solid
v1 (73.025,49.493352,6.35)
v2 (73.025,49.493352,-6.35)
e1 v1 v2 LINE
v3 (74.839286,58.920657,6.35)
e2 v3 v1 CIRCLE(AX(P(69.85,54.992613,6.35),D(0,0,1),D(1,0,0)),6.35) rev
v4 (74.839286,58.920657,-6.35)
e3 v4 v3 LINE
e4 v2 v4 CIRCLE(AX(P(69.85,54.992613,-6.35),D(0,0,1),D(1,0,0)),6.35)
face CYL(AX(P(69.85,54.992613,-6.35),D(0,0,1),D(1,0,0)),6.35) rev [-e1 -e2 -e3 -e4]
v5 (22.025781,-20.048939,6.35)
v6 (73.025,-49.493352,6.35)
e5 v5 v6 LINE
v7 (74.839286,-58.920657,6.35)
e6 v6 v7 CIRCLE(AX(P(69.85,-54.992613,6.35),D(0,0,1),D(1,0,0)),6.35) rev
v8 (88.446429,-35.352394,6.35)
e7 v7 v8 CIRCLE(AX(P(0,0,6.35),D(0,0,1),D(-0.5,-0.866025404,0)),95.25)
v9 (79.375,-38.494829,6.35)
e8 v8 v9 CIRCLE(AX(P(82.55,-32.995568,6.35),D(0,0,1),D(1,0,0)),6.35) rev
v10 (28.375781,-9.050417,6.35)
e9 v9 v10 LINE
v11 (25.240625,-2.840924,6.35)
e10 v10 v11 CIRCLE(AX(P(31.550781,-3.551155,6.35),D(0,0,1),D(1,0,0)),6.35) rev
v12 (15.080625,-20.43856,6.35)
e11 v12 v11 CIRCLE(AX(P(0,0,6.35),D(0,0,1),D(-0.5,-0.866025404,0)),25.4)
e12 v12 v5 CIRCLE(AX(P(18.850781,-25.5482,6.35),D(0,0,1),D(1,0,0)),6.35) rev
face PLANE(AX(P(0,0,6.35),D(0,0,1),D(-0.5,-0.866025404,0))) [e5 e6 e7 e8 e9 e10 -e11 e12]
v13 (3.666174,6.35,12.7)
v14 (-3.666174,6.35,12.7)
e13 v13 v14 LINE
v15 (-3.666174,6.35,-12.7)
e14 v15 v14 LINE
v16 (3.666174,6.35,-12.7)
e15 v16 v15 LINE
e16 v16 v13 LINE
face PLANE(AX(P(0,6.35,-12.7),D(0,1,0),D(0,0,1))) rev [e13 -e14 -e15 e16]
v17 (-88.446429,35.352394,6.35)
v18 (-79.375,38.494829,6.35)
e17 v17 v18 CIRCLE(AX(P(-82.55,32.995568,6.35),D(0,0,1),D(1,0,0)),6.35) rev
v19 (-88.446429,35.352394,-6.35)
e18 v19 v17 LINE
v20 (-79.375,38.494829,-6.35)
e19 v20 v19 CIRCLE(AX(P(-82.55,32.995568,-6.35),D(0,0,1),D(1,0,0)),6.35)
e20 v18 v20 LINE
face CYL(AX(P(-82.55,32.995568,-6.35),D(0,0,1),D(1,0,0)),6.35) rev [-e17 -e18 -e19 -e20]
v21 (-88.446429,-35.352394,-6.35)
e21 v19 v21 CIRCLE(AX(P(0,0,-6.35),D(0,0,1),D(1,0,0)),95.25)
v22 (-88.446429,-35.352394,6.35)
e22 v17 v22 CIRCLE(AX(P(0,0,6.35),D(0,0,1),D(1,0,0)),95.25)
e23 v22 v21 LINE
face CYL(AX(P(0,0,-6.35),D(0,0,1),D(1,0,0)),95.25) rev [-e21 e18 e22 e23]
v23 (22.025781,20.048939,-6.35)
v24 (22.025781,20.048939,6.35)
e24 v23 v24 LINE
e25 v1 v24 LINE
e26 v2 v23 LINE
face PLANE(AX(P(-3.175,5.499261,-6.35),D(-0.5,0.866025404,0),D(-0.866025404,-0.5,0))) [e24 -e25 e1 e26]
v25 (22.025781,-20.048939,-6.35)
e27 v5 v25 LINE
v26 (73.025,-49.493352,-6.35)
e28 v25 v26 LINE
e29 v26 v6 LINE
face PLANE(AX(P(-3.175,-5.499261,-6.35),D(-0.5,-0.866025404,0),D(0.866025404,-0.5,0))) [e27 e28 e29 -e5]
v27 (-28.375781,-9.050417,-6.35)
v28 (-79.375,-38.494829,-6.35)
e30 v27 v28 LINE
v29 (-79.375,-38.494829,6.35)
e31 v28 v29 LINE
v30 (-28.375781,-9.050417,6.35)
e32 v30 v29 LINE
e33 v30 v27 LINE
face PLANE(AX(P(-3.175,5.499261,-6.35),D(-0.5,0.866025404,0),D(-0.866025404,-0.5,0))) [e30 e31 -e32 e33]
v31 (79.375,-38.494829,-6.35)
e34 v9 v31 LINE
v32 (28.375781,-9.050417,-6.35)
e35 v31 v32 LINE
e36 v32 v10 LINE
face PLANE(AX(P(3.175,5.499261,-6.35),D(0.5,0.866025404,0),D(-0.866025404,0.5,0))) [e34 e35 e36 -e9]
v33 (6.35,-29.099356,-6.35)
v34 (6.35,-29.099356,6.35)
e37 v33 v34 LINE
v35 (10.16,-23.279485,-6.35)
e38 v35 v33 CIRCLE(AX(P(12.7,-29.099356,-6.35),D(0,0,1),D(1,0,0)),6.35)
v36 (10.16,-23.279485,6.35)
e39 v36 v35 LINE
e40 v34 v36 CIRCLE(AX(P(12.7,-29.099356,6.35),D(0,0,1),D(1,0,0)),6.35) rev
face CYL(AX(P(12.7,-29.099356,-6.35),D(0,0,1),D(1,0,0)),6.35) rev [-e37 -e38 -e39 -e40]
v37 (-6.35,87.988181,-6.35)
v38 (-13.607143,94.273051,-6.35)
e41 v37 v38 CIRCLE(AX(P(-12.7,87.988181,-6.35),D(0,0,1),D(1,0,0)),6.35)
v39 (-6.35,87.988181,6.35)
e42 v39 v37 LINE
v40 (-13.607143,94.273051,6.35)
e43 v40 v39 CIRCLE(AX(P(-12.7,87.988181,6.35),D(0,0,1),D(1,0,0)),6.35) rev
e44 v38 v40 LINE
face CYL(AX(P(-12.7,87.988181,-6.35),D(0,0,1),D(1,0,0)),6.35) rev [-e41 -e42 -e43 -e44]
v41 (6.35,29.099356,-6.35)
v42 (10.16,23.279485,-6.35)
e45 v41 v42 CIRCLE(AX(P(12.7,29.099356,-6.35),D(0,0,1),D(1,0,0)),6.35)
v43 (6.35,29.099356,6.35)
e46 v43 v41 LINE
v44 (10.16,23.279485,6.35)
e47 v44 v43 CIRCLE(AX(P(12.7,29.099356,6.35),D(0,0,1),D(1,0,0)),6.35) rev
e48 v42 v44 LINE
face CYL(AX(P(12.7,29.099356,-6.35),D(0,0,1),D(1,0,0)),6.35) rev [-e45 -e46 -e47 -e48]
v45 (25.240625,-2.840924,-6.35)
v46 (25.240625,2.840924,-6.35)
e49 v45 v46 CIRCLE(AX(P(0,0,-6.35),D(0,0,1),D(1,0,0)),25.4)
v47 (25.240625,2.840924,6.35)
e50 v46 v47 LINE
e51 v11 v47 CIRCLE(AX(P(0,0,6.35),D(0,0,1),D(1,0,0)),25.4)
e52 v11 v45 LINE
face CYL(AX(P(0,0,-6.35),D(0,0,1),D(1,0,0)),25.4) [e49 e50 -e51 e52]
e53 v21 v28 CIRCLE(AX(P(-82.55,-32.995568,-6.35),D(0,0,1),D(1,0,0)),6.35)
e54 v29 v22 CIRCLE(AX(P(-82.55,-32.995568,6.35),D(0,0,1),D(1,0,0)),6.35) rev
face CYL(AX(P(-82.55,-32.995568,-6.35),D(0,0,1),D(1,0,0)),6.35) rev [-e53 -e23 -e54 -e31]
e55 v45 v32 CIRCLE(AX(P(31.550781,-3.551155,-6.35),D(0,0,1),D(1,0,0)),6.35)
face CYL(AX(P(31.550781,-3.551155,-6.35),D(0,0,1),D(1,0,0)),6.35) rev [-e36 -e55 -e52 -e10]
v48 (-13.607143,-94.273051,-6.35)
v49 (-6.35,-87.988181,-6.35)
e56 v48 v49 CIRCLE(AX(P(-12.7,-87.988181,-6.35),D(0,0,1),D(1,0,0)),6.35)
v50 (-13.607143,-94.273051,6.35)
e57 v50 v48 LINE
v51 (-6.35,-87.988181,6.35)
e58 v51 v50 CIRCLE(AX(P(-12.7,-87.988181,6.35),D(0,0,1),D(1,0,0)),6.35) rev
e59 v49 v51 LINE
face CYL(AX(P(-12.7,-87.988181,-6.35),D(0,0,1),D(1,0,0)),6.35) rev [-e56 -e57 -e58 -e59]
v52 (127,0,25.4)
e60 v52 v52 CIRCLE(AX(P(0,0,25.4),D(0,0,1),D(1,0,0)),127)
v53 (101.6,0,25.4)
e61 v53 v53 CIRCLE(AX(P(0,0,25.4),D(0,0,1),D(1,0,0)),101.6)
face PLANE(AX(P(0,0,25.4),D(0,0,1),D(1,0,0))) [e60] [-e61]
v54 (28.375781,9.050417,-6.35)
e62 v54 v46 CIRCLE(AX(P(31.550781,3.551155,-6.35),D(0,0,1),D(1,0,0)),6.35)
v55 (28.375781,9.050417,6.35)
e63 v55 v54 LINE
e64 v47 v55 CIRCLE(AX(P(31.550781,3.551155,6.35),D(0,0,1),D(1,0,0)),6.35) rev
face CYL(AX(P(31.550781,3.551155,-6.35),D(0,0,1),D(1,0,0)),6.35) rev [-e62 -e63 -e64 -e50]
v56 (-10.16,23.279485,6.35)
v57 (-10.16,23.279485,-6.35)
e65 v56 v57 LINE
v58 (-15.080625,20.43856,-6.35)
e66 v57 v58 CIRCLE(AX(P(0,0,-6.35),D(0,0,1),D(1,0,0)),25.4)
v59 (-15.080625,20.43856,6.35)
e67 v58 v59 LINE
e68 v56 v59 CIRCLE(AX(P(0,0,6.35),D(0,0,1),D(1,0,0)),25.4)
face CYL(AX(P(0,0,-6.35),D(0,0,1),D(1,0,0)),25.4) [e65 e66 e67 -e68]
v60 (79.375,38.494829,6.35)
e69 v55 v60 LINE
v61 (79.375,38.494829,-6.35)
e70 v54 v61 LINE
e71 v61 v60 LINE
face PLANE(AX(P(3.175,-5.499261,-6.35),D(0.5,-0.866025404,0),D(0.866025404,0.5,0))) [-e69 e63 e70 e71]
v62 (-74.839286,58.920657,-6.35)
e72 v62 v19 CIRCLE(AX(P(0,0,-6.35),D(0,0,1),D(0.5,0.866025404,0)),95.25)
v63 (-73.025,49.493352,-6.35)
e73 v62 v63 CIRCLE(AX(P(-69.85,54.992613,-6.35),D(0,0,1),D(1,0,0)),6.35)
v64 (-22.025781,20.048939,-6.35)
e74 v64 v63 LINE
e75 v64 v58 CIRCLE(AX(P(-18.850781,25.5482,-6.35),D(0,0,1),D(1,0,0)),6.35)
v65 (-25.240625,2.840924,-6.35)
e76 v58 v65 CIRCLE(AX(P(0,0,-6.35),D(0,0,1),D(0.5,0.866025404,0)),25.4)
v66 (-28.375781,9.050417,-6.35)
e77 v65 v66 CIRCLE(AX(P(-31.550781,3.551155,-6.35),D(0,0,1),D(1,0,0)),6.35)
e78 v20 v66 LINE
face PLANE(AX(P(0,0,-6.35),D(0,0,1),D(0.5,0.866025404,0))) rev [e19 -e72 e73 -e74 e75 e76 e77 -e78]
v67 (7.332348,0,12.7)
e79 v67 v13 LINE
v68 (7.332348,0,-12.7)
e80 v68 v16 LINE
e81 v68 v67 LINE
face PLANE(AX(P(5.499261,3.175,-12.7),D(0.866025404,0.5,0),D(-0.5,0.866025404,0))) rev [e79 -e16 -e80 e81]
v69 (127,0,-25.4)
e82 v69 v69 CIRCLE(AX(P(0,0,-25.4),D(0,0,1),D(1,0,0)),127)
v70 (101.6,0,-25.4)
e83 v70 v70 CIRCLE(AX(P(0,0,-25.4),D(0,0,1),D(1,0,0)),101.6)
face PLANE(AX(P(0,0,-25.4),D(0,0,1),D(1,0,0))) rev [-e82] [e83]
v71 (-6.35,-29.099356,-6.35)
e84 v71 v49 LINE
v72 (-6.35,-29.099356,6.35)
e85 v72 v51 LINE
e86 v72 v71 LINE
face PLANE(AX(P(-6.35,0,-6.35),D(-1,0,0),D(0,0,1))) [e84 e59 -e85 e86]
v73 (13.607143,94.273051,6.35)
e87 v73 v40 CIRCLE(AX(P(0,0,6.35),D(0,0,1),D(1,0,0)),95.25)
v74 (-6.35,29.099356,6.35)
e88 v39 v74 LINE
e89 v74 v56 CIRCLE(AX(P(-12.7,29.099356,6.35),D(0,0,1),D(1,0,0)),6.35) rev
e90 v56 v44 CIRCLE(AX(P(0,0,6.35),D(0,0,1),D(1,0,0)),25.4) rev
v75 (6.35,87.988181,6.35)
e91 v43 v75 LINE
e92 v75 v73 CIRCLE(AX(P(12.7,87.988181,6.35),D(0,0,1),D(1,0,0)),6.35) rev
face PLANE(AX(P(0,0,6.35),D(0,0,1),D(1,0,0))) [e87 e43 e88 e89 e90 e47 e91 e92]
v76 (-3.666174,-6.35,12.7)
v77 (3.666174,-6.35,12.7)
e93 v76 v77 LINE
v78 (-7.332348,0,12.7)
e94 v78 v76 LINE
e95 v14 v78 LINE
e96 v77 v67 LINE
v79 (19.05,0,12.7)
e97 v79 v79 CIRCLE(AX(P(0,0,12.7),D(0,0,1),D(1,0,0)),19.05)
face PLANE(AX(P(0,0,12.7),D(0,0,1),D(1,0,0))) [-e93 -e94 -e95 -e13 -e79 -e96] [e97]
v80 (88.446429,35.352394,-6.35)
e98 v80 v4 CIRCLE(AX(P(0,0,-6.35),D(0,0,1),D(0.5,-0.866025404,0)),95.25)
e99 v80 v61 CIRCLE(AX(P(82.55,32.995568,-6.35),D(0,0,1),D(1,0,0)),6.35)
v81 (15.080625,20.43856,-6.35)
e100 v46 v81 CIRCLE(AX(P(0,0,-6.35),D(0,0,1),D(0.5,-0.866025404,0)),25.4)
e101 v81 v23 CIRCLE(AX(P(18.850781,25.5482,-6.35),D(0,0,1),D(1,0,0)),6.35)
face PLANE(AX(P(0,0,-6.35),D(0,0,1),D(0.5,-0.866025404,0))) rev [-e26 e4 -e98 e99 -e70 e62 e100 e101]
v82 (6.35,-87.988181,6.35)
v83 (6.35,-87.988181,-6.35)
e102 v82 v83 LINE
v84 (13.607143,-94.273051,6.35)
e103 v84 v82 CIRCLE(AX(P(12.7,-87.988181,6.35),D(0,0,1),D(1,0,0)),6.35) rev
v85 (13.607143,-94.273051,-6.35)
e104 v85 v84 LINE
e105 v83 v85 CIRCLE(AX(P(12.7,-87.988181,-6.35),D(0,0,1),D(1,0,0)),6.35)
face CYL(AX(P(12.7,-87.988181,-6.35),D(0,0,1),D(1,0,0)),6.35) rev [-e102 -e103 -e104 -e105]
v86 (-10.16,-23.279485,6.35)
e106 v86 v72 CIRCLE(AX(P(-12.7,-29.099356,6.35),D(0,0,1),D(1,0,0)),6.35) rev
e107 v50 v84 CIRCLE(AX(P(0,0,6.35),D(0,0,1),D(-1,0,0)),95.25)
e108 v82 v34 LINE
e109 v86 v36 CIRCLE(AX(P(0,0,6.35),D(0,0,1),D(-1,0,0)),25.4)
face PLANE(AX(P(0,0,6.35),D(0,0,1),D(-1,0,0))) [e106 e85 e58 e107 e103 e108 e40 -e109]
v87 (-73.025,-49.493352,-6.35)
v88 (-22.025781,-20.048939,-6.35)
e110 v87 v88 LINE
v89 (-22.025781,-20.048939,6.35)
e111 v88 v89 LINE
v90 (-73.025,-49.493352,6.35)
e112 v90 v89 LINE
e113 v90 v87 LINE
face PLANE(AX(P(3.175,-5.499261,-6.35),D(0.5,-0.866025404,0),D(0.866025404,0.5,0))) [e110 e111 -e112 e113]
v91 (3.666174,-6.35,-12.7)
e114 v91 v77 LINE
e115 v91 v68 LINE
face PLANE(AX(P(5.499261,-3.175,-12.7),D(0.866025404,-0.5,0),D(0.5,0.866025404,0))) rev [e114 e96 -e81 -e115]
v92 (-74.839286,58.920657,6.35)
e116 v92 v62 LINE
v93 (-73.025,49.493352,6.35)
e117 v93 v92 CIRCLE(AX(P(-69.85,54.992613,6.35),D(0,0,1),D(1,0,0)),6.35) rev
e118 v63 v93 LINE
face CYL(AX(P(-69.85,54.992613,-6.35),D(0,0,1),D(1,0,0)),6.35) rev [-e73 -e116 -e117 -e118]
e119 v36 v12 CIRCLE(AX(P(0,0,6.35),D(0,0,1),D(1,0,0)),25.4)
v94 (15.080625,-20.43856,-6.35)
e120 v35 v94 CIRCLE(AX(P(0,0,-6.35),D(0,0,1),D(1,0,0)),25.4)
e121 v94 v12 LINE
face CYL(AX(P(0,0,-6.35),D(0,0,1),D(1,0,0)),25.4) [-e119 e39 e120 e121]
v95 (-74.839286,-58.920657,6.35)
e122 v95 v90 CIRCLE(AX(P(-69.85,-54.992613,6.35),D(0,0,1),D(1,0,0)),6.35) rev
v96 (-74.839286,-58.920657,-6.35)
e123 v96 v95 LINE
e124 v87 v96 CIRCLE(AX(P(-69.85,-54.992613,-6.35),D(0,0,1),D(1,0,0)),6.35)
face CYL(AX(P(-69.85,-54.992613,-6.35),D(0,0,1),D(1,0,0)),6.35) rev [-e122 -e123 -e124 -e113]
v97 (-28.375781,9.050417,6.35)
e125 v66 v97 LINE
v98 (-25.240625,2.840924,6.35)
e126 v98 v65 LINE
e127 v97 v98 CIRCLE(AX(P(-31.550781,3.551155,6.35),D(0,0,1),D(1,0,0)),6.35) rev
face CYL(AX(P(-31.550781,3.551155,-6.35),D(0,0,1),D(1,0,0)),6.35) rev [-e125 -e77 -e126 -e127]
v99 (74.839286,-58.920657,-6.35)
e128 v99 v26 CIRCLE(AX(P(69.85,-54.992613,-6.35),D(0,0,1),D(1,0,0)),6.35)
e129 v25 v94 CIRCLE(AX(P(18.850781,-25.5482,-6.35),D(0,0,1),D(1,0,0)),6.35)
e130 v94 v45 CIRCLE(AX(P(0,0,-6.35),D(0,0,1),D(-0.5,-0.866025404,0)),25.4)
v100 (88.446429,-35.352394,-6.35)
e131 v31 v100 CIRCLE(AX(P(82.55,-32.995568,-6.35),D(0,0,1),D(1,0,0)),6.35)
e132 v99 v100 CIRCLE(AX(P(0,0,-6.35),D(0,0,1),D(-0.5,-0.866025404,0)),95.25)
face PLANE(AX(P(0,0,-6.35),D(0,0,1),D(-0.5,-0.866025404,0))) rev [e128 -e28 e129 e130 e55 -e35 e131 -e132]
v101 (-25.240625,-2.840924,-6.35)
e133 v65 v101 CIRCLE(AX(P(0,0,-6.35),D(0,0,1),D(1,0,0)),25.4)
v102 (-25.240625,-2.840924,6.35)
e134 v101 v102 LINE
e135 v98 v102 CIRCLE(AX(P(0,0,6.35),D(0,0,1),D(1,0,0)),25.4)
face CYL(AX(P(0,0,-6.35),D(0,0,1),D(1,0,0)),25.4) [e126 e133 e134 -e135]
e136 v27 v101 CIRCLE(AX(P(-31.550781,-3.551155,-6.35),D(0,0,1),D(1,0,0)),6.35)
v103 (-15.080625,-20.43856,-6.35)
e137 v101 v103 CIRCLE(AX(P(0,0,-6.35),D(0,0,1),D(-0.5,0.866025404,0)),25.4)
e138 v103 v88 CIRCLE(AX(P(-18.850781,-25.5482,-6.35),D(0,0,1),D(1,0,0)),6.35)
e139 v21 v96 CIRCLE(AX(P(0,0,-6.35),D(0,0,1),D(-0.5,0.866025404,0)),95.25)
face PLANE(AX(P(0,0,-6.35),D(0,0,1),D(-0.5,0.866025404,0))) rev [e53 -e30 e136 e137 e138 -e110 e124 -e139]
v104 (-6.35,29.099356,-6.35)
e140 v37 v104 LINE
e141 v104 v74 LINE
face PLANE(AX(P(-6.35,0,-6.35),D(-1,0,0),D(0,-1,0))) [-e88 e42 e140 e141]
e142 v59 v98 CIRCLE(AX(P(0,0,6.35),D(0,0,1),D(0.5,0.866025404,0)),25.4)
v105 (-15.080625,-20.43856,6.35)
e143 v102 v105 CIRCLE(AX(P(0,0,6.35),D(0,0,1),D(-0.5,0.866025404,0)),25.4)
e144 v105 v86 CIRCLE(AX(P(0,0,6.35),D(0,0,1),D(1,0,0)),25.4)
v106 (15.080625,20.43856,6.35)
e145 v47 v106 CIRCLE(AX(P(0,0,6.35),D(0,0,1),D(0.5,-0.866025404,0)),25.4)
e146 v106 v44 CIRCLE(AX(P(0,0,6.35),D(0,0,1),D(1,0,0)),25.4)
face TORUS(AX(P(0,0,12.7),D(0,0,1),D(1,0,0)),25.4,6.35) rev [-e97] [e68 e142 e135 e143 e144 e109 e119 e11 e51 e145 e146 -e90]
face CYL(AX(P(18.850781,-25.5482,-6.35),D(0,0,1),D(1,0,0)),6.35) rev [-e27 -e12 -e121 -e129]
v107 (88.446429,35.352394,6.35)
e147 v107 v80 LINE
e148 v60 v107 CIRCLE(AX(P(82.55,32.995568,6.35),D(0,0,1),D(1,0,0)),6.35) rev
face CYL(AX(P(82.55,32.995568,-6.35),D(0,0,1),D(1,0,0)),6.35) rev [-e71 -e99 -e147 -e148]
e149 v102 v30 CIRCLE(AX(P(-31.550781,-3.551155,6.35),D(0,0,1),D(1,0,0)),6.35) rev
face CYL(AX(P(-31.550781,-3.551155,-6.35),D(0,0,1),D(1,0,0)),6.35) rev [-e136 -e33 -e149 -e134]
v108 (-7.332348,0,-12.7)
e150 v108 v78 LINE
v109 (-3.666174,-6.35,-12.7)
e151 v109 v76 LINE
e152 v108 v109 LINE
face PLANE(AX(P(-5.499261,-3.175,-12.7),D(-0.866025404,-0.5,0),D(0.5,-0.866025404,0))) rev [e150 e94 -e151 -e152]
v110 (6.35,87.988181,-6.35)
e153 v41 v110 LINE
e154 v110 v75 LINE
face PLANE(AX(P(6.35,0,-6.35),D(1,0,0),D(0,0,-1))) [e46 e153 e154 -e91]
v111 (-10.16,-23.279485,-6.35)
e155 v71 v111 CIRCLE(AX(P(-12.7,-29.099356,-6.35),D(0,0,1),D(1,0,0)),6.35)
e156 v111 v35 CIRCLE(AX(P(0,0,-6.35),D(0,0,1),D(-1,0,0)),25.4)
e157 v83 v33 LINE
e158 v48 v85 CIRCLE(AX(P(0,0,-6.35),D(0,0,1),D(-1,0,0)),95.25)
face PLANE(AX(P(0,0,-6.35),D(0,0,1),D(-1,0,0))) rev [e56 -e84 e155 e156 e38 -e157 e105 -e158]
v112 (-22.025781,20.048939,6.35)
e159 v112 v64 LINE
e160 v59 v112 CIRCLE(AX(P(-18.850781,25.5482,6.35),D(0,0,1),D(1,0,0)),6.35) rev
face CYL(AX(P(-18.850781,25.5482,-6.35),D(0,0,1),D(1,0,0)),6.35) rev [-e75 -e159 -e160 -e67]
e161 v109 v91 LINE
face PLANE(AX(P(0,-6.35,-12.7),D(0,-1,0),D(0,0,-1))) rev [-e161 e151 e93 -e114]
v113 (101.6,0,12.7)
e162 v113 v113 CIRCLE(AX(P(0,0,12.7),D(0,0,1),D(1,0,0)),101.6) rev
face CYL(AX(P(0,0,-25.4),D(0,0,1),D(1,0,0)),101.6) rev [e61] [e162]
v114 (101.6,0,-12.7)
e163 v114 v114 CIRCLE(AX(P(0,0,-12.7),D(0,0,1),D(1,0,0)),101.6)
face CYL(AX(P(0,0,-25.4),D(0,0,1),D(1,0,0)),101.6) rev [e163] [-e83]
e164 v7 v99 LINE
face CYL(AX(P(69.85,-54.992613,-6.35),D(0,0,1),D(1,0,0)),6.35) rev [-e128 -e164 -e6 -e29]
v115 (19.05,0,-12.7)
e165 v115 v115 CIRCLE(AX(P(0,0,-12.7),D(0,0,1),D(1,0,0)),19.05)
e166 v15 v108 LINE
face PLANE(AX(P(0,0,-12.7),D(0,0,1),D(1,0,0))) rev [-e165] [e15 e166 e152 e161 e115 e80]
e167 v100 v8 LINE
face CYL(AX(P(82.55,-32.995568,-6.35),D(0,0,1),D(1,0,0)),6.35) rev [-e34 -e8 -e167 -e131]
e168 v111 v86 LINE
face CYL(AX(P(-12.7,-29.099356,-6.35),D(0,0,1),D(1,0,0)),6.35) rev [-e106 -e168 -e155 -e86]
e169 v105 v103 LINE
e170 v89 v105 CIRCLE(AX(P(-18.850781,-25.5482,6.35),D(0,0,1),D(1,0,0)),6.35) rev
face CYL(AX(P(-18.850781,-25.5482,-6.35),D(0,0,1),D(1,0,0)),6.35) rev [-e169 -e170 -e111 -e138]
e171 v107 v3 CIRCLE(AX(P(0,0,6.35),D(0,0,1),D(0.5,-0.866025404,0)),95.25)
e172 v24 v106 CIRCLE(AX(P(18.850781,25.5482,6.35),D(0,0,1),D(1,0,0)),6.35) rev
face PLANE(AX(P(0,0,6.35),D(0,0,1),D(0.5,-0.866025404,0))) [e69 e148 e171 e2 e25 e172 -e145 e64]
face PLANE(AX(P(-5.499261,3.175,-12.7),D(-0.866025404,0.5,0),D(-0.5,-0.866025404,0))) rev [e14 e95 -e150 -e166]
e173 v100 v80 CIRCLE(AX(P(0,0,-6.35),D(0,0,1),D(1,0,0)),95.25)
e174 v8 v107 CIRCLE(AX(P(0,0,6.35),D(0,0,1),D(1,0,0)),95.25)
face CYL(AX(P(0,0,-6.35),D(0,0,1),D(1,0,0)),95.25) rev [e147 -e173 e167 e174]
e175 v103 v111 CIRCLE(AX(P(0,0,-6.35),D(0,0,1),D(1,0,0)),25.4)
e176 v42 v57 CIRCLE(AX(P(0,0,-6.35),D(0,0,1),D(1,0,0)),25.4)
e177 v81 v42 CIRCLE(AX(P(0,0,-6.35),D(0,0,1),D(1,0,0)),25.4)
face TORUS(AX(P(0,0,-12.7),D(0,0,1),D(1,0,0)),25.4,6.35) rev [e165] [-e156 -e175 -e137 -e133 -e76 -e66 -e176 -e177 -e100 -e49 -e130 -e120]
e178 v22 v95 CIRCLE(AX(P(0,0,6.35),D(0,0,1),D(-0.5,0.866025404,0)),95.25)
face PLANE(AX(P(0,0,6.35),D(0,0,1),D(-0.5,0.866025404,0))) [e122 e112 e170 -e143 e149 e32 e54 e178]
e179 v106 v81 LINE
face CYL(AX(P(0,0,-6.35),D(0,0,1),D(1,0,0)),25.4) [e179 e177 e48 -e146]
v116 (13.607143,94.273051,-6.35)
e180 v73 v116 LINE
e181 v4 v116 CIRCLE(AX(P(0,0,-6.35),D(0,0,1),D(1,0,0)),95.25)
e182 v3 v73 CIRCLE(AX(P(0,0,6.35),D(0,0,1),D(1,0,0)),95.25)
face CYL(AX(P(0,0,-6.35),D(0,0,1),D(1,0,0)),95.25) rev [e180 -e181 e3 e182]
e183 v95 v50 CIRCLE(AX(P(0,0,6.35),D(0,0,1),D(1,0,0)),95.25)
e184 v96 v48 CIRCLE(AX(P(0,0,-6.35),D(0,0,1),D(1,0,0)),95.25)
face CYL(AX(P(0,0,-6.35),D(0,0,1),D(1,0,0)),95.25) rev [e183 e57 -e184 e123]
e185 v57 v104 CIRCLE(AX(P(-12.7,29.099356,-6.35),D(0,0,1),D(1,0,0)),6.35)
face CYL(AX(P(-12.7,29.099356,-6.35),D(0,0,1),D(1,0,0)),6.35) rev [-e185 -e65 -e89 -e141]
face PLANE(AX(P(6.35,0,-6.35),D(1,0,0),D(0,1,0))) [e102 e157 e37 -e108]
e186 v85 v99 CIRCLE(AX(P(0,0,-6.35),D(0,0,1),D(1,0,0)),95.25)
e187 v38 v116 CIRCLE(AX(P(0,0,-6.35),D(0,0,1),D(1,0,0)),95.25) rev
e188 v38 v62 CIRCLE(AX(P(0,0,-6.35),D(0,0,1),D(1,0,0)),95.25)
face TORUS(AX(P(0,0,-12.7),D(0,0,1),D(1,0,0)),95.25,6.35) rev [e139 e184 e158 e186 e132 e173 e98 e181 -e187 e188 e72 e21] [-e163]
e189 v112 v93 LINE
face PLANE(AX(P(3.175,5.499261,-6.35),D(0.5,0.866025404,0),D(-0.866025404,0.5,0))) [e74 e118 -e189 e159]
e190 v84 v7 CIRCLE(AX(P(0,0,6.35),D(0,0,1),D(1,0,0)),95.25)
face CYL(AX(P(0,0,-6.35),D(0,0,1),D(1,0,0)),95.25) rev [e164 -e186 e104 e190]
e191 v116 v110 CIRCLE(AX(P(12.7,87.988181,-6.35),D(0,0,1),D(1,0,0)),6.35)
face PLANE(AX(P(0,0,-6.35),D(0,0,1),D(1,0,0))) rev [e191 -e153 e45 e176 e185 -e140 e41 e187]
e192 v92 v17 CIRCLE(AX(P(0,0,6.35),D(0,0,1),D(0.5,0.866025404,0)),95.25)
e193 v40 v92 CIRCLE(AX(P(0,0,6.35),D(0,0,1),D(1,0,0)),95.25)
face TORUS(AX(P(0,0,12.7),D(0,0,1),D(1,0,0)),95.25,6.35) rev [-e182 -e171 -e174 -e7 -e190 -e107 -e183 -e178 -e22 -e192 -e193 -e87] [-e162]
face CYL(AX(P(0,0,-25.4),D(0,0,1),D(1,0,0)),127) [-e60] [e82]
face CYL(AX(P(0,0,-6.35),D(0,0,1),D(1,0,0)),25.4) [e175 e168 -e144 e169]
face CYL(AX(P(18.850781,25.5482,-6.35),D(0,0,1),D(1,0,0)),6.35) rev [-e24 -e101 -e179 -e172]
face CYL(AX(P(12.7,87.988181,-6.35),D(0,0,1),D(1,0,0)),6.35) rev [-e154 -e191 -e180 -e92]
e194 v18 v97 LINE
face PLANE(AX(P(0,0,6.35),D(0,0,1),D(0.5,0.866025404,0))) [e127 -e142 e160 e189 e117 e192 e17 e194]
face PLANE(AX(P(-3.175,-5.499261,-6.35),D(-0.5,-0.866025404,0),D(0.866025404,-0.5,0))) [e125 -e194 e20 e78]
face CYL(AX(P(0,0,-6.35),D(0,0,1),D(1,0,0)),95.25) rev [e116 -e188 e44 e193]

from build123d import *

# Parameters (mm, degrees)
BOSS_EXTRUDE1_DEPTH      = 25.4
BOSS_EXTRUDE1_DEPTH_BACK = 25.4
SKETCH1_R                = 127
SKETCH1_R_2              = 101.6
BOSS_EXTRUDE2_DEPTH      = 6.35
BOSS_EXTRUDE2_DEPTH_BACK = 6.35
SKETCH1_4_R              = 101.6
SKETCH1_4_R_2            = 95.25
SKETCH1_4_R_3            = 25.4
SKETCH1_4_R_4            = 19.05
BOSS_EXTRUDE3_DEPTH      = 12.7
BOSS_EXTRUDE3_DEPTH_BACK = 12.7
SKETCH1_5_R              = 19.05
BOSS_EXTRUDE4_DEPTH      = 6.35
FILLET1_R                = 6.35
CIRPATTERN2_START        = -6.35
CIRPATTERN2_DEPTH        = 12.7


with BuildPart() as part:
    # Sketch1 → Boss-Extrude1 (new, two sides: drawn at the far end of the back side and taken through both)
    with BuildSketch(Plane.XY.offset(-BOSS_EXTRUDE1_DEPTH_BACK)):
        Circle(SKETCH1_R)
        Circle(SKETCH1_R_2, mode=Mode.SUBTRACT)
    extrude(amount=BOSS_EXTRUDE1_DEPTH + BOSS_EXTRUDE1_DEPTH_BACK)

    # Sketch1<4> → Boss-Extrude2 (add, two sides: drawn at the far end of the back side and taken through both)
    # profile 1 of 2: a face of its own
    with BuildSketch(Plane.XY.offset(-BOSS_EXTRUDE2_DEPTH_BACK)):
        Circle(SKETCH1_4_R)
        Circle(SKETCH1_4_R_2, mode=Mode.SUBTRACT)
    # profile 2 of 2: a face of its own
    with BuildSketch(Plane.XY.offset(-BOSS_EXTRUDE2_DEPTH_BACK)):
        Circle(SKETCH1_4_R_3)
        Circle(SKETCH1_4_R_4, mode=Mode.SUBTRACT)
    extrude(amount=BOSS_EXTRUDE2_DEPTH + BOSS_EXTRUDE2_DEPTH_BACK)


with BuildPart() as boss_extrude2_piece_1:
    # of the separate pieces the step leaves, piece 1, a body of its own (boss_extrude2_pieces)
    add(part.part.solids().sort_by_distance((127, 0, 0))[0])



with BuildPart() as boss_extrude2_piece_2:
    # of the separate pieces the step leaves, piece 2, a body of its own (boss_extrude2_pieces)
    add(part.part.solids().sort_by_distance((25.4, 0, 0))[0])

    # Sketch1<5> → Boss-Extrude3 (add, two sides: drawn at the far end of the back side and taken through both)
    with BuildSketch(Plane.XY.offset(-BOSS_EXTRUDE3_DEPTH_BACK)):
        Circle(SKETCH1_5_R)
        Polygon((3.666174209, -6.35), (7.332348419, 0), (3.666174209, 6.35), (-3.666174209, 6.35), (-7.332348419, 0), (-3.666174209, -6.35), align=None, mode=Mode.SUBTRACT)
    extrude(amount=BOSS_EXTRUDE3_DEPTH + BOSS_EXTRUDE3_DEPTH_BACK)


with BuildPart() as boss_extrude2_piece_1_1:
    add(boss_extrude2_piece_1.part)

    add(boss_extrude2_piece_2.part)  # Boss-Extrude4 merges Boss-Extrude2 piece 2
    # Sketch1<6> → Boss-Extrude4 (add, symmetric)
    with BuildSketch(Plane.XY):
        with BuildLine():
            ThreePointArc((6.35, 95.038097624), (0, 95.25), (-6.35, 95.038097624))
            Line((-6.35, 95.038097624), (-6.35, 24.593444248))
            ThreePointArc((-6.35, 24.593444248), (0, 25.4), (6.35, 24.593444248))
            Line((6.35, 24.593444248), (6.35, 95.038097624))
        make_face()
    extrude(amount=BOSS_EXTRUDE4_DEPTH, both=True)

    # Fillet1
    fillet1_edges = [boss_extrude2_piece_1_1.edges().sort_by_distance(p)[0] for p in [
        (6.35, 95.038097624, 0),
        (6.35, 24.593444248, 0),
        (-6.35, 24.593444248, 0),
        (-6.35, 95.038097624, 0),
    ]]
    fillet(fillet1_edges, radius=FILLET1_R)

    # Fillet2: read off the stored shape, not the designer's step
    # Fillet2 outline → Fillet2 (revolve)
    with BuildSketch(Plane.XZ):
        with BuildLine():
            ThreePointArc((25.4, 6.35), (20.909871939, 8.209871939), (19.05, 12.7))
            Line((19.05, 12.7), (19.05, 6.35))
            Line((19.05, 6.35), (25.4, 6.35))
        make_face()
        with BuildLine():
            ThreePointArc((101.6, 12.7), (99.740128061, 8.209871939), (95.25, 6.35))
            Line((95.25, 6.35), (101.6, 6.35))
            Line((101.6, 6.35), (101.6, 12.7))
        make_face()
        with BuildLine():
            ThreePointArc((19.05, -12.7), (20.909871939, -8.209871939), (25.4, -6.35))
            Line((25.4, -6.35), (19.05, -6.35))
            Line((19.05, -6.35), (19.05, -12.7))
        make_face()
        with BuildLine():
            Line((101.6, -6.35), (95.25, -6.35))
            ThreePointArc((95.25, -6.35), (99.740128061, -8.209871939), (101.6, -12.7))
            Line((101.6, -12.7), (101.6, -6.35))
        make_face()
    revolve(axis=Axis((0, 0, 0), (0, 0, 1)))

    # CirPattern2: read off the stored shape, not the designer's step
    # CirPattern2 outline → CirPattern2 (add)
    with BuildSketch(Plane.XY.offset(CIRPATTERN2_START)):
        with BuildLine():
            ThreePointArc((13.607142857, -94.273051098), (8.542949191, -92.788329832), (6.35, -87.988181024))
            Line((6.35, -87.988181024), (6.35, -29.099355663))
            ThreePointArc((6.35, -29.099355663), (7.387208832, -25.621317423), (10.16, -23.27948453))
            ThreePointArc((10.16, -23.27948453), (0, -25.4), (-10.16, -23.27948453))
            ThreePointArc((-10.16, -23.27948453), (-7.387208832, -25.621317423), (-6.35, -29.099355663))
            Line((-6.35, -29.099355663), (-6.35, -87.988181024))
            ThreePointArc((-6.35, -87.988181024), (-8.542949191, -92.788329832), (-13.607142857, -94.273051098))
            ThreePointArc((-13.607142857, -94.273051098), (0, -95.25), (13.607142857, -94.273051098))
        make_face()
        with BuildLine():
            ThreePointArc((73.025, -49.493351826), (76.085576213, -53.792575939), (74.839285714, -58.920656936))
            ThreePointArc((74.839285714, -58.920656936), (82.48891971, -47.625), (88.446428571, -35.352394162))
            ThreePointArc((88.446428571, -35.352394162), (84.628525404, -38.995753893), (79.375, -38.494829198))
            Line((79.375, -38.494829198), (28.375781238, -9.050416517))
            ThreePointArc((28.375781238, -9.050416517), (25.882316182, -6.4131482), (25.24062499, -2.840924163))
            ThreePointArc((25.24062499, -2.840924163), (21.997045256, -12.7), (15.08062499, -20.438560368))
            ThreePointArc((15.08062499, -20.438560368), (18.495107351, -19.208169223), (22.025781238, -20.048939146))
            Line((22.025781238, -20.048939146), (73.025, -49.493351826))
        make_face()
        with BuildLine():
            ThreePointArc((-88.446428571, -35.352394162), (-82.48891971, -47.625), (-74.839285714, -58.920656936))
            ThreePointArc((-74.839285714, -58.920656936), (-76.085576213, -53.792575939), (-73.025, -49.493351826))
            Line((-73.025, -49.493351826), (-22.025781238, -20.048939146))
            ThreePointArc((-22.025781238, -20.048939146), (-18.495107351, -19.208169223), (-15.08062499, -20.438560368))
            ThreePointArc((-15.08062499, -20.438560368), (-21.997045256, -12.7), (-25.24062499, -2.840924163))
            ThreePointArc((-25.24062499, -2.840924163), (-25.882316182, -6.4131482), (-28.375781238, -9.050416517))
            Line((-28.375781238, -9.050416517), (-79.375, -38.494829198))
            ThreePointArc((-79.375, -38.494829198), (-84.628525404, -38.995753893), (-88.446428571, -35.352394162))
        make_face()
        with BuildLine():
            ThreePointArc((79.375, 38.494829198), (84.628525404, 38.995753893), (88.446428571, 35.352394162))
            ThreePointArc((88.446428571, 35.352394162), (82.488919711, 47.625), (74.839285714, 58.920656936))
            ThreePointArc((74.839285714, 58.920656936), (76.085576213, 53.792575939), (73.025, 49.493351826))
            Line((73.025, 49.493351826), (22.025781238, 20.048939146))
            ThreePointArc((22.025781238, 20.048939146), (18.495107351, 19.208169223), (15.08062499, 20.438560368))
            ThreePointArc((15.08062499, 20.438560368), (21.997045256, 12.7), (25.24062499, 2.840924163))
            ThreePointArc((25.24062499, 2.840924163), (25.882316182, 6.4131482), (28.375781238, 9.050416517))
            Line((28.375781238, 9.050416517), (79.375, 38.494829198))
        make_face()
        with BuildLine():
            ThreePointArc((-74.839285714, 58.920656936), (-82.488919711, 47.625), (-88.446428571, 35.352394162))
            ThreePointArc((-88.446428571, 35.352394162), (-84.628525404, 38.995753893), (-79.375, 38.494829198))
            Line((-79.375, 38.494829198), (-28.375781238, 9.050416517))
            ThreePointArc((-28.375781238, 9.050416517), (-25.882316182, 6.4131482), (-25.24062499, 2.840924163))
            ThreePointArc((-25.24062499, 2.840924163), (-21.997045256, 12.7), (-15.08062499, 20.438560368))
            ThreePointArc((-15.08062499, 20.438560368), (-18.495107351, 19.208169223), (-22.025781238, 20.048939146))
            Line((-22.025781238, 20.048939146), (-73.025, 49.493351826))
            ThreePointArc((-73.025, 49.493351826), (-76.085576213, 53.792575939), (-74.839285714, 58.920656936))
        make_face()
    extrude(amount=CIRPATTERN2_DEPTH)


solid = boss_extrude2_piece_1_1.part
